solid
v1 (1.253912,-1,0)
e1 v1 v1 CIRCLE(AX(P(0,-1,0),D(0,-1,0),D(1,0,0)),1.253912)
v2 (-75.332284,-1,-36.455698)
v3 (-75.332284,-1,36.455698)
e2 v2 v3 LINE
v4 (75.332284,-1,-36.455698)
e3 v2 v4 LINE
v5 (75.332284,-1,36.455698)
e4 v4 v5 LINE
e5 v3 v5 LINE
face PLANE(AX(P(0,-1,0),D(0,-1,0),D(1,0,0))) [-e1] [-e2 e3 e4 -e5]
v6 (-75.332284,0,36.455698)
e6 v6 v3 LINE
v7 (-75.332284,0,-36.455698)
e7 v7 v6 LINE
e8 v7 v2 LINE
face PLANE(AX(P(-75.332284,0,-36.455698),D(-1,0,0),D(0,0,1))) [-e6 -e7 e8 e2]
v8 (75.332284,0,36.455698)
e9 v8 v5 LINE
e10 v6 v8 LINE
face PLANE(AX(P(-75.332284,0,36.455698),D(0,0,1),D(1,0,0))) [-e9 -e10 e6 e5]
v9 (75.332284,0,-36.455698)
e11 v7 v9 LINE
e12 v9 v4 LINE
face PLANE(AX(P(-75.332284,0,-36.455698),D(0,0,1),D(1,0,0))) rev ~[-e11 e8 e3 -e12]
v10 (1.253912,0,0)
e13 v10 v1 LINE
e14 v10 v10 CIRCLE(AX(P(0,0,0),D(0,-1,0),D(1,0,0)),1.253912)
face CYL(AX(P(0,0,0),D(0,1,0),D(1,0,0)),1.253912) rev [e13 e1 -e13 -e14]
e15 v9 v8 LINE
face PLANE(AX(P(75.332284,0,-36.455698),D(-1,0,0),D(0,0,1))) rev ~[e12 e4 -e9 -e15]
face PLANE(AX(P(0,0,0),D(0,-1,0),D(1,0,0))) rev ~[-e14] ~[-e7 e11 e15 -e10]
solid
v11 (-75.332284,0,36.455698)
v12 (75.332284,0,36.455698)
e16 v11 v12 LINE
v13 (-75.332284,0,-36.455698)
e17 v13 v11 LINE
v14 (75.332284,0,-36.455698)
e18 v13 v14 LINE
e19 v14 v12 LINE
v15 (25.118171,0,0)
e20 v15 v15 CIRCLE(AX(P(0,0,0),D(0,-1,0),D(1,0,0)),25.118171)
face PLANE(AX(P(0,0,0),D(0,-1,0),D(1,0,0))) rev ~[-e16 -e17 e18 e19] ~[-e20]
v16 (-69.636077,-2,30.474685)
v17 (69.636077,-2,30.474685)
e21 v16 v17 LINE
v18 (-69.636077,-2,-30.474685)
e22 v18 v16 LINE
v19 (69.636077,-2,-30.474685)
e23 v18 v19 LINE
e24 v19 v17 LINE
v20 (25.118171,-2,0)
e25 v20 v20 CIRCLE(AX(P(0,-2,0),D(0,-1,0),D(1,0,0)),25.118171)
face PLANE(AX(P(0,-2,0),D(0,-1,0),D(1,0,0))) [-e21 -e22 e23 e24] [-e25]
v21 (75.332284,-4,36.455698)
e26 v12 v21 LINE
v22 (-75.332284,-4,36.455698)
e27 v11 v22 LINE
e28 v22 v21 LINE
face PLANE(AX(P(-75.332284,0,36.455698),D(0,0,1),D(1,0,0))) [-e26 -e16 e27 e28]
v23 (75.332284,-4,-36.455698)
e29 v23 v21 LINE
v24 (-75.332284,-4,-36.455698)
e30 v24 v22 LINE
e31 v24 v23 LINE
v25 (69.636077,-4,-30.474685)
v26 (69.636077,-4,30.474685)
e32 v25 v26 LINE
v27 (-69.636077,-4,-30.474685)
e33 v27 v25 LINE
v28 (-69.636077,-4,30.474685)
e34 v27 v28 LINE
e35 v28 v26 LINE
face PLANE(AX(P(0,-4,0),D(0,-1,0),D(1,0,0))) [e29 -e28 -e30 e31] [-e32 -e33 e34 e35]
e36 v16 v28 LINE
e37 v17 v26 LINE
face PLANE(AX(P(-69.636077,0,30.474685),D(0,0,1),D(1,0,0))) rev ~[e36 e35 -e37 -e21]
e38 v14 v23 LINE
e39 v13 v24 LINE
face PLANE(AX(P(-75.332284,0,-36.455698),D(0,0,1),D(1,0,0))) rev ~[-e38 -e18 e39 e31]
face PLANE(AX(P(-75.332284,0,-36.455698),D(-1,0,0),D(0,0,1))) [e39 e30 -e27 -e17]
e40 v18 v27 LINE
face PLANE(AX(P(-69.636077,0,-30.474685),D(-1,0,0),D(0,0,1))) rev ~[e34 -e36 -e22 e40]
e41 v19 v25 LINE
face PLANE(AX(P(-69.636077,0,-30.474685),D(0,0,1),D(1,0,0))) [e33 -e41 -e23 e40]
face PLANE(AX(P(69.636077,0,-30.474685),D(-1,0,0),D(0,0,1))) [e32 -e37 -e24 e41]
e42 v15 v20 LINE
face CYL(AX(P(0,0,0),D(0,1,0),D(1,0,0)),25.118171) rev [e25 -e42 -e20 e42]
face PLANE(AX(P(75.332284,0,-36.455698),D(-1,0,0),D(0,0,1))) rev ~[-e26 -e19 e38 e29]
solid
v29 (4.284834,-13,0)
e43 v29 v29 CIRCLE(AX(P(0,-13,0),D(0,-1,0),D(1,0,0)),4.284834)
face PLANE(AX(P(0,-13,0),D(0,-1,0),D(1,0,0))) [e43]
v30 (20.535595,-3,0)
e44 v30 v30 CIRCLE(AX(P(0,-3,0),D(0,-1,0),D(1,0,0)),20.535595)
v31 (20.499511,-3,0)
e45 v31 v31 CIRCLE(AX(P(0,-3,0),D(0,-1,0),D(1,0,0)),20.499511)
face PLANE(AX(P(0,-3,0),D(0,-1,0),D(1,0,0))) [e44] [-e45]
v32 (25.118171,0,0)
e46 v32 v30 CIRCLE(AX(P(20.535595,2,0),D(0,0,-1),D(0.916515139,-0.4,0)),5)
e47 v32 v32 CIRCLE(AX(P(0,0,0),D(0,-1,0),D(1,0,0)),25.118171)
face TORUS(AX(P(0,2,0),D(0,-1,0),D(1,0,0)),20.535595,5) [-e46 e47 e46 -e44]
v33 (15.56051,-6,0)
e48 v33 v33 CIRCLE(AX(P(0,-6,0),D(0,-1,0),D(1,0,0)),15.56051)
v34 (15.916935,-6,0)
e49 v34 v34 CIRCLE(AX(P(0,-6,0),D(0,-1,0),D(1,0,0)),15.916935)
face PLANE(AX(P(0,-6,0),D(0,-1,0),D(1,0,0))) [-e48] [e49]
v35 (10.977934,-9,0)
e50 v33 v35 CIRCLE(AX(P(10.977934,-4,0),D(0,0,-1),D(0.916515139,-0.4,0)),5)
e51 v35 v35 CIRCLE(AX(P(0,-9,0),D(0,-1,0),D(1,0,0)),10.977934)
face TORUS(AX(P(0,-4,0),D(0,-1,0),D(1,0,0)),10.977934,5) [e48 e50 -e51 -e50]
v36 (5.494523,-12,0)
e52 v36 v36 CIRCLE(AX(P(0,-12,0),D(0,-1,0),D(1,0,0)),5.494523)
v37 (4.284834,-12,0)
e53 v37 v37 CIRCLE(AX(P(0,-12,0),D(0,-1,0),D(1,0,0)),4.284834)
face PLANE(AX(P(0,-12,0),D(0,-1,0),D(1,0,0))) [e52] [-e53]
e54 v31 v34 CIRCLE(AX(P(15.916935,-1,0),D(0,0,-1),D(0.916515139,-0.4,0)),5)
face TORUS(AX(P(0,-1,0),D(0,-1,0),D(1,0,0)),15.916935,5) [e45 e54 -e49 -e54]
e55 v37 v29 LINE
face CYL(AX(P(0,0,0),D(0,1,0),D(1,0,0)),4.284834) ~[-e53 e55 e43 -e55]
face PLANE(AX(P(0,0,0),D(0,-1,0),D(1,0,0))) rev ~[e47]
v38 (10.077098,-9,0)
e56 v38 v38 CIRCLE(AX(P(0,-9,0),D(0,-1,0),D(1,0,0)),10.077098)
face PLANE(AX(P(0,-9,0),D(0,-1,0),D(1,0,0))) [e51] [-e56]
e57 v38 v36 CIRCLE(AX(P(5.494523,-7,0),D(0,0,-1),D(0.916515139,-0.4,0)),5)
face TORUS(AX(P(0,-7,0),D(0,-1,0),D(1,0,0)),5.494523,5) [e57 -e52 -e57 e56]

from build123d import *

# Parameters (mm, degrees)
F0_R      = 25.1181711361
F0_R_2    = 20.4995111856
F1_DEPTH  = 3
F0_R_3    = 15.560509686
F2_DEPTH  = 6
F0_R_4    = 10.0770984701
F3_DEPTH  = 9
F0_R_5    = 4.2848341216
F4_DEPTH  = 12
F0_R_6    = 1.2539122761
F5_DEPTH  = 13
F6_DEPTH  = 13
F0_W      = 150.6645679474
F0_H      = 72.9113966227
F0_W_2    = 139.2721533775
F0_H_2    = 60.949370265
F8_DEPTH  = 4
F9_DEPTH  = 2
F10_DEPTH = 1


# Not quite as in the source:
# - a fillet or chamfer that OpenCascade refuses, or shapes differently, is made with other operations: its cross-section is extruded or revolved along the edge and cut away or added


with BuildPart() as f1:
    # F0 (on Front) → F1 (new body)
    with BuildSketch(Plane.XZ):
        Circle(F0_R)
        Circle(F0_R_2, mode=Mode.SUBTRACT)
    extrude(amount=F1_DEPTH)

    # F0 (on Front) → F2 (join)
    with BuildSketch(Plane.XZ):
        Circle(F0_R_2)
        Circle(F0_R_3, mode=Mode.SUBTRACT)
    extrude(amount=F2_DEPTH)

    # F0 (on Front) → F3 (join)
    with BuildSketch(Plane.XZ):
        Circle(F0_R_3)
        Circle(F0_R_4, mode=Mode.SUBTRACT)
    extrude(amount=F3_DEPTH)

    # F0 (on Front) → F4 (join)
    with BuildSketch(Plane.XZ):
        Circle(F0_R_4)
        Circle(F0_R_5, mode=Mode.SUBTRACT)
    extrude(amount=F4_DEPTH)

    # F0 (on Front) → F5 (join)
    with BuildSketch(Plane.XZ):
        Circle(F0_R_5)
        Circle(F0_R_6, mode=Mode.SUBTRACT)
    extrude(amount=F5_DEPTH)

    # F0 (on Front) → F6 (join)
    with BuildSketch(Plane.XZ):
        Circle(F0_R_6)
    extrude(amount=F6_DEPTH)

    # F7: fillet of radius 5 on 4 edges, made by hand

    # F7_s1 → F7_t2 (revolve, cut)
    with BuildSketch(Plane.XY):
        with BuildLine():
            ThreePointArc((25.1181711361, 0), (23.2742082286, -2.1833001327), (20.5355954411, -3))
            Line((20.5355954411, -3), (25.1181711361, -3))
            Line((25.1181711361, -3), (25.1181711361, 0))
        make_face()
    revolve(axis=Axis((0, -3, 0), (0, -1, 0)), mode=Mode.SUBTRACT)

    # F7_s3 → F7_t4 (revolve, cut)
    with BuildSketch(Plane.XY):
        with BuildLine():
            ThreePointArc((20.4995111856, -3), (18.6555482782, -5.1833001327), (15.9169354907, -6))
            Line((15.9169354907, -6), (20.4995111856, -6))
            Line((20.4995111856, -6), (20.4995111856, -3))
        make_face()
    revolve(axis=Axis((0, -6, 0), (0, -1, 0)), mode=Mode.SUBTRACT)

    # F7_s5 → F7_t6 (revolve, cut)
    with BuildSketch(Plane.XY):
        with BuildLine():
            ThreePointArc((15.560509686, -6), (13.7165467785, -8.1833001327), (10.977933991, -9))
            Line((10.977933991, -9), (15.560509686, -9))
            Line((15.560509686, -9), (15.560509686, -6))
        make_face()
    revolve(axis=Axis((0, -9, 0), (0, -1, 0)), mode=Mode.SUBTRACT)

    # F7_s7 → F7_t8 (revolve, cut)
    with BuildSketch(Plane.XY):
        with BuildLine():
            ThreePointArc((10.0770984701, -9), (8.2331355627, -11.1833001327), (5.4945227752, -12))
            Line((5.4945227752, -12), (10.0770984701, -12))
            Line((10.0770984701, -12), (10.0770984701, -9))
        make_face()
    revolve(axis=Axis((0, -12, 0), (0, -1, 0)), mode=Mode.SUBTRACT)


with BuildPart() as f8:
    # F0 (on Front) → F8 (new body)
    with BuildSketch(Plane.XZ):
        Rectangle(F0_W, F0_H)
        Rectangle(F0_W_2, F0_H_2, mode=Mode.SUBTRACT)
    extrude(amount=F8_DEPTH)

    # F0 (on Front) → F9 (join)
    with BuildSketch(Plane.XZ):
        Rectangle(F0_W_2, F0_H_2)
        Circle(F0_R, mode=Mode.SUBTRACT)
    extrude(amount=F9_DEPTH)


with BuildPart() as f10:
    # F0 (on Front) → F10 (new body)
    with BuildSketch(Plane.XZ):
        Rectangle(F0_W, F0_H)
        Rectangle(F0_W_2, F0_H_2, mode=Mode.SUBTRACT)
        Rectangle(F0_W_2, F0_H_2)
        Circle(F0_R, mode=Mode.SUBTRACT)
        Circle(F0_R)
        Circle(F0_R_2, mode=Mode.SUBTRACT)
        Circle(F0_R_2)
        Circle(F0_R_3, mode=Mode.SUBTRACT)
        Circle(F0_R_3)
        Circle(F0_R_4, mode=Mode.SUBTRACT)
        Circle(F0_R_4)
        Circle(F0_R_5, mode=Mode.SUBTRACT)
        Circle(F0_R_5)
        Circle(F0_R_6, mode=Mode.SUBTRACT)
    extrude(amount=F10_DEPTH)


solid = Compound([f1.part, f8.part, f10.part])
